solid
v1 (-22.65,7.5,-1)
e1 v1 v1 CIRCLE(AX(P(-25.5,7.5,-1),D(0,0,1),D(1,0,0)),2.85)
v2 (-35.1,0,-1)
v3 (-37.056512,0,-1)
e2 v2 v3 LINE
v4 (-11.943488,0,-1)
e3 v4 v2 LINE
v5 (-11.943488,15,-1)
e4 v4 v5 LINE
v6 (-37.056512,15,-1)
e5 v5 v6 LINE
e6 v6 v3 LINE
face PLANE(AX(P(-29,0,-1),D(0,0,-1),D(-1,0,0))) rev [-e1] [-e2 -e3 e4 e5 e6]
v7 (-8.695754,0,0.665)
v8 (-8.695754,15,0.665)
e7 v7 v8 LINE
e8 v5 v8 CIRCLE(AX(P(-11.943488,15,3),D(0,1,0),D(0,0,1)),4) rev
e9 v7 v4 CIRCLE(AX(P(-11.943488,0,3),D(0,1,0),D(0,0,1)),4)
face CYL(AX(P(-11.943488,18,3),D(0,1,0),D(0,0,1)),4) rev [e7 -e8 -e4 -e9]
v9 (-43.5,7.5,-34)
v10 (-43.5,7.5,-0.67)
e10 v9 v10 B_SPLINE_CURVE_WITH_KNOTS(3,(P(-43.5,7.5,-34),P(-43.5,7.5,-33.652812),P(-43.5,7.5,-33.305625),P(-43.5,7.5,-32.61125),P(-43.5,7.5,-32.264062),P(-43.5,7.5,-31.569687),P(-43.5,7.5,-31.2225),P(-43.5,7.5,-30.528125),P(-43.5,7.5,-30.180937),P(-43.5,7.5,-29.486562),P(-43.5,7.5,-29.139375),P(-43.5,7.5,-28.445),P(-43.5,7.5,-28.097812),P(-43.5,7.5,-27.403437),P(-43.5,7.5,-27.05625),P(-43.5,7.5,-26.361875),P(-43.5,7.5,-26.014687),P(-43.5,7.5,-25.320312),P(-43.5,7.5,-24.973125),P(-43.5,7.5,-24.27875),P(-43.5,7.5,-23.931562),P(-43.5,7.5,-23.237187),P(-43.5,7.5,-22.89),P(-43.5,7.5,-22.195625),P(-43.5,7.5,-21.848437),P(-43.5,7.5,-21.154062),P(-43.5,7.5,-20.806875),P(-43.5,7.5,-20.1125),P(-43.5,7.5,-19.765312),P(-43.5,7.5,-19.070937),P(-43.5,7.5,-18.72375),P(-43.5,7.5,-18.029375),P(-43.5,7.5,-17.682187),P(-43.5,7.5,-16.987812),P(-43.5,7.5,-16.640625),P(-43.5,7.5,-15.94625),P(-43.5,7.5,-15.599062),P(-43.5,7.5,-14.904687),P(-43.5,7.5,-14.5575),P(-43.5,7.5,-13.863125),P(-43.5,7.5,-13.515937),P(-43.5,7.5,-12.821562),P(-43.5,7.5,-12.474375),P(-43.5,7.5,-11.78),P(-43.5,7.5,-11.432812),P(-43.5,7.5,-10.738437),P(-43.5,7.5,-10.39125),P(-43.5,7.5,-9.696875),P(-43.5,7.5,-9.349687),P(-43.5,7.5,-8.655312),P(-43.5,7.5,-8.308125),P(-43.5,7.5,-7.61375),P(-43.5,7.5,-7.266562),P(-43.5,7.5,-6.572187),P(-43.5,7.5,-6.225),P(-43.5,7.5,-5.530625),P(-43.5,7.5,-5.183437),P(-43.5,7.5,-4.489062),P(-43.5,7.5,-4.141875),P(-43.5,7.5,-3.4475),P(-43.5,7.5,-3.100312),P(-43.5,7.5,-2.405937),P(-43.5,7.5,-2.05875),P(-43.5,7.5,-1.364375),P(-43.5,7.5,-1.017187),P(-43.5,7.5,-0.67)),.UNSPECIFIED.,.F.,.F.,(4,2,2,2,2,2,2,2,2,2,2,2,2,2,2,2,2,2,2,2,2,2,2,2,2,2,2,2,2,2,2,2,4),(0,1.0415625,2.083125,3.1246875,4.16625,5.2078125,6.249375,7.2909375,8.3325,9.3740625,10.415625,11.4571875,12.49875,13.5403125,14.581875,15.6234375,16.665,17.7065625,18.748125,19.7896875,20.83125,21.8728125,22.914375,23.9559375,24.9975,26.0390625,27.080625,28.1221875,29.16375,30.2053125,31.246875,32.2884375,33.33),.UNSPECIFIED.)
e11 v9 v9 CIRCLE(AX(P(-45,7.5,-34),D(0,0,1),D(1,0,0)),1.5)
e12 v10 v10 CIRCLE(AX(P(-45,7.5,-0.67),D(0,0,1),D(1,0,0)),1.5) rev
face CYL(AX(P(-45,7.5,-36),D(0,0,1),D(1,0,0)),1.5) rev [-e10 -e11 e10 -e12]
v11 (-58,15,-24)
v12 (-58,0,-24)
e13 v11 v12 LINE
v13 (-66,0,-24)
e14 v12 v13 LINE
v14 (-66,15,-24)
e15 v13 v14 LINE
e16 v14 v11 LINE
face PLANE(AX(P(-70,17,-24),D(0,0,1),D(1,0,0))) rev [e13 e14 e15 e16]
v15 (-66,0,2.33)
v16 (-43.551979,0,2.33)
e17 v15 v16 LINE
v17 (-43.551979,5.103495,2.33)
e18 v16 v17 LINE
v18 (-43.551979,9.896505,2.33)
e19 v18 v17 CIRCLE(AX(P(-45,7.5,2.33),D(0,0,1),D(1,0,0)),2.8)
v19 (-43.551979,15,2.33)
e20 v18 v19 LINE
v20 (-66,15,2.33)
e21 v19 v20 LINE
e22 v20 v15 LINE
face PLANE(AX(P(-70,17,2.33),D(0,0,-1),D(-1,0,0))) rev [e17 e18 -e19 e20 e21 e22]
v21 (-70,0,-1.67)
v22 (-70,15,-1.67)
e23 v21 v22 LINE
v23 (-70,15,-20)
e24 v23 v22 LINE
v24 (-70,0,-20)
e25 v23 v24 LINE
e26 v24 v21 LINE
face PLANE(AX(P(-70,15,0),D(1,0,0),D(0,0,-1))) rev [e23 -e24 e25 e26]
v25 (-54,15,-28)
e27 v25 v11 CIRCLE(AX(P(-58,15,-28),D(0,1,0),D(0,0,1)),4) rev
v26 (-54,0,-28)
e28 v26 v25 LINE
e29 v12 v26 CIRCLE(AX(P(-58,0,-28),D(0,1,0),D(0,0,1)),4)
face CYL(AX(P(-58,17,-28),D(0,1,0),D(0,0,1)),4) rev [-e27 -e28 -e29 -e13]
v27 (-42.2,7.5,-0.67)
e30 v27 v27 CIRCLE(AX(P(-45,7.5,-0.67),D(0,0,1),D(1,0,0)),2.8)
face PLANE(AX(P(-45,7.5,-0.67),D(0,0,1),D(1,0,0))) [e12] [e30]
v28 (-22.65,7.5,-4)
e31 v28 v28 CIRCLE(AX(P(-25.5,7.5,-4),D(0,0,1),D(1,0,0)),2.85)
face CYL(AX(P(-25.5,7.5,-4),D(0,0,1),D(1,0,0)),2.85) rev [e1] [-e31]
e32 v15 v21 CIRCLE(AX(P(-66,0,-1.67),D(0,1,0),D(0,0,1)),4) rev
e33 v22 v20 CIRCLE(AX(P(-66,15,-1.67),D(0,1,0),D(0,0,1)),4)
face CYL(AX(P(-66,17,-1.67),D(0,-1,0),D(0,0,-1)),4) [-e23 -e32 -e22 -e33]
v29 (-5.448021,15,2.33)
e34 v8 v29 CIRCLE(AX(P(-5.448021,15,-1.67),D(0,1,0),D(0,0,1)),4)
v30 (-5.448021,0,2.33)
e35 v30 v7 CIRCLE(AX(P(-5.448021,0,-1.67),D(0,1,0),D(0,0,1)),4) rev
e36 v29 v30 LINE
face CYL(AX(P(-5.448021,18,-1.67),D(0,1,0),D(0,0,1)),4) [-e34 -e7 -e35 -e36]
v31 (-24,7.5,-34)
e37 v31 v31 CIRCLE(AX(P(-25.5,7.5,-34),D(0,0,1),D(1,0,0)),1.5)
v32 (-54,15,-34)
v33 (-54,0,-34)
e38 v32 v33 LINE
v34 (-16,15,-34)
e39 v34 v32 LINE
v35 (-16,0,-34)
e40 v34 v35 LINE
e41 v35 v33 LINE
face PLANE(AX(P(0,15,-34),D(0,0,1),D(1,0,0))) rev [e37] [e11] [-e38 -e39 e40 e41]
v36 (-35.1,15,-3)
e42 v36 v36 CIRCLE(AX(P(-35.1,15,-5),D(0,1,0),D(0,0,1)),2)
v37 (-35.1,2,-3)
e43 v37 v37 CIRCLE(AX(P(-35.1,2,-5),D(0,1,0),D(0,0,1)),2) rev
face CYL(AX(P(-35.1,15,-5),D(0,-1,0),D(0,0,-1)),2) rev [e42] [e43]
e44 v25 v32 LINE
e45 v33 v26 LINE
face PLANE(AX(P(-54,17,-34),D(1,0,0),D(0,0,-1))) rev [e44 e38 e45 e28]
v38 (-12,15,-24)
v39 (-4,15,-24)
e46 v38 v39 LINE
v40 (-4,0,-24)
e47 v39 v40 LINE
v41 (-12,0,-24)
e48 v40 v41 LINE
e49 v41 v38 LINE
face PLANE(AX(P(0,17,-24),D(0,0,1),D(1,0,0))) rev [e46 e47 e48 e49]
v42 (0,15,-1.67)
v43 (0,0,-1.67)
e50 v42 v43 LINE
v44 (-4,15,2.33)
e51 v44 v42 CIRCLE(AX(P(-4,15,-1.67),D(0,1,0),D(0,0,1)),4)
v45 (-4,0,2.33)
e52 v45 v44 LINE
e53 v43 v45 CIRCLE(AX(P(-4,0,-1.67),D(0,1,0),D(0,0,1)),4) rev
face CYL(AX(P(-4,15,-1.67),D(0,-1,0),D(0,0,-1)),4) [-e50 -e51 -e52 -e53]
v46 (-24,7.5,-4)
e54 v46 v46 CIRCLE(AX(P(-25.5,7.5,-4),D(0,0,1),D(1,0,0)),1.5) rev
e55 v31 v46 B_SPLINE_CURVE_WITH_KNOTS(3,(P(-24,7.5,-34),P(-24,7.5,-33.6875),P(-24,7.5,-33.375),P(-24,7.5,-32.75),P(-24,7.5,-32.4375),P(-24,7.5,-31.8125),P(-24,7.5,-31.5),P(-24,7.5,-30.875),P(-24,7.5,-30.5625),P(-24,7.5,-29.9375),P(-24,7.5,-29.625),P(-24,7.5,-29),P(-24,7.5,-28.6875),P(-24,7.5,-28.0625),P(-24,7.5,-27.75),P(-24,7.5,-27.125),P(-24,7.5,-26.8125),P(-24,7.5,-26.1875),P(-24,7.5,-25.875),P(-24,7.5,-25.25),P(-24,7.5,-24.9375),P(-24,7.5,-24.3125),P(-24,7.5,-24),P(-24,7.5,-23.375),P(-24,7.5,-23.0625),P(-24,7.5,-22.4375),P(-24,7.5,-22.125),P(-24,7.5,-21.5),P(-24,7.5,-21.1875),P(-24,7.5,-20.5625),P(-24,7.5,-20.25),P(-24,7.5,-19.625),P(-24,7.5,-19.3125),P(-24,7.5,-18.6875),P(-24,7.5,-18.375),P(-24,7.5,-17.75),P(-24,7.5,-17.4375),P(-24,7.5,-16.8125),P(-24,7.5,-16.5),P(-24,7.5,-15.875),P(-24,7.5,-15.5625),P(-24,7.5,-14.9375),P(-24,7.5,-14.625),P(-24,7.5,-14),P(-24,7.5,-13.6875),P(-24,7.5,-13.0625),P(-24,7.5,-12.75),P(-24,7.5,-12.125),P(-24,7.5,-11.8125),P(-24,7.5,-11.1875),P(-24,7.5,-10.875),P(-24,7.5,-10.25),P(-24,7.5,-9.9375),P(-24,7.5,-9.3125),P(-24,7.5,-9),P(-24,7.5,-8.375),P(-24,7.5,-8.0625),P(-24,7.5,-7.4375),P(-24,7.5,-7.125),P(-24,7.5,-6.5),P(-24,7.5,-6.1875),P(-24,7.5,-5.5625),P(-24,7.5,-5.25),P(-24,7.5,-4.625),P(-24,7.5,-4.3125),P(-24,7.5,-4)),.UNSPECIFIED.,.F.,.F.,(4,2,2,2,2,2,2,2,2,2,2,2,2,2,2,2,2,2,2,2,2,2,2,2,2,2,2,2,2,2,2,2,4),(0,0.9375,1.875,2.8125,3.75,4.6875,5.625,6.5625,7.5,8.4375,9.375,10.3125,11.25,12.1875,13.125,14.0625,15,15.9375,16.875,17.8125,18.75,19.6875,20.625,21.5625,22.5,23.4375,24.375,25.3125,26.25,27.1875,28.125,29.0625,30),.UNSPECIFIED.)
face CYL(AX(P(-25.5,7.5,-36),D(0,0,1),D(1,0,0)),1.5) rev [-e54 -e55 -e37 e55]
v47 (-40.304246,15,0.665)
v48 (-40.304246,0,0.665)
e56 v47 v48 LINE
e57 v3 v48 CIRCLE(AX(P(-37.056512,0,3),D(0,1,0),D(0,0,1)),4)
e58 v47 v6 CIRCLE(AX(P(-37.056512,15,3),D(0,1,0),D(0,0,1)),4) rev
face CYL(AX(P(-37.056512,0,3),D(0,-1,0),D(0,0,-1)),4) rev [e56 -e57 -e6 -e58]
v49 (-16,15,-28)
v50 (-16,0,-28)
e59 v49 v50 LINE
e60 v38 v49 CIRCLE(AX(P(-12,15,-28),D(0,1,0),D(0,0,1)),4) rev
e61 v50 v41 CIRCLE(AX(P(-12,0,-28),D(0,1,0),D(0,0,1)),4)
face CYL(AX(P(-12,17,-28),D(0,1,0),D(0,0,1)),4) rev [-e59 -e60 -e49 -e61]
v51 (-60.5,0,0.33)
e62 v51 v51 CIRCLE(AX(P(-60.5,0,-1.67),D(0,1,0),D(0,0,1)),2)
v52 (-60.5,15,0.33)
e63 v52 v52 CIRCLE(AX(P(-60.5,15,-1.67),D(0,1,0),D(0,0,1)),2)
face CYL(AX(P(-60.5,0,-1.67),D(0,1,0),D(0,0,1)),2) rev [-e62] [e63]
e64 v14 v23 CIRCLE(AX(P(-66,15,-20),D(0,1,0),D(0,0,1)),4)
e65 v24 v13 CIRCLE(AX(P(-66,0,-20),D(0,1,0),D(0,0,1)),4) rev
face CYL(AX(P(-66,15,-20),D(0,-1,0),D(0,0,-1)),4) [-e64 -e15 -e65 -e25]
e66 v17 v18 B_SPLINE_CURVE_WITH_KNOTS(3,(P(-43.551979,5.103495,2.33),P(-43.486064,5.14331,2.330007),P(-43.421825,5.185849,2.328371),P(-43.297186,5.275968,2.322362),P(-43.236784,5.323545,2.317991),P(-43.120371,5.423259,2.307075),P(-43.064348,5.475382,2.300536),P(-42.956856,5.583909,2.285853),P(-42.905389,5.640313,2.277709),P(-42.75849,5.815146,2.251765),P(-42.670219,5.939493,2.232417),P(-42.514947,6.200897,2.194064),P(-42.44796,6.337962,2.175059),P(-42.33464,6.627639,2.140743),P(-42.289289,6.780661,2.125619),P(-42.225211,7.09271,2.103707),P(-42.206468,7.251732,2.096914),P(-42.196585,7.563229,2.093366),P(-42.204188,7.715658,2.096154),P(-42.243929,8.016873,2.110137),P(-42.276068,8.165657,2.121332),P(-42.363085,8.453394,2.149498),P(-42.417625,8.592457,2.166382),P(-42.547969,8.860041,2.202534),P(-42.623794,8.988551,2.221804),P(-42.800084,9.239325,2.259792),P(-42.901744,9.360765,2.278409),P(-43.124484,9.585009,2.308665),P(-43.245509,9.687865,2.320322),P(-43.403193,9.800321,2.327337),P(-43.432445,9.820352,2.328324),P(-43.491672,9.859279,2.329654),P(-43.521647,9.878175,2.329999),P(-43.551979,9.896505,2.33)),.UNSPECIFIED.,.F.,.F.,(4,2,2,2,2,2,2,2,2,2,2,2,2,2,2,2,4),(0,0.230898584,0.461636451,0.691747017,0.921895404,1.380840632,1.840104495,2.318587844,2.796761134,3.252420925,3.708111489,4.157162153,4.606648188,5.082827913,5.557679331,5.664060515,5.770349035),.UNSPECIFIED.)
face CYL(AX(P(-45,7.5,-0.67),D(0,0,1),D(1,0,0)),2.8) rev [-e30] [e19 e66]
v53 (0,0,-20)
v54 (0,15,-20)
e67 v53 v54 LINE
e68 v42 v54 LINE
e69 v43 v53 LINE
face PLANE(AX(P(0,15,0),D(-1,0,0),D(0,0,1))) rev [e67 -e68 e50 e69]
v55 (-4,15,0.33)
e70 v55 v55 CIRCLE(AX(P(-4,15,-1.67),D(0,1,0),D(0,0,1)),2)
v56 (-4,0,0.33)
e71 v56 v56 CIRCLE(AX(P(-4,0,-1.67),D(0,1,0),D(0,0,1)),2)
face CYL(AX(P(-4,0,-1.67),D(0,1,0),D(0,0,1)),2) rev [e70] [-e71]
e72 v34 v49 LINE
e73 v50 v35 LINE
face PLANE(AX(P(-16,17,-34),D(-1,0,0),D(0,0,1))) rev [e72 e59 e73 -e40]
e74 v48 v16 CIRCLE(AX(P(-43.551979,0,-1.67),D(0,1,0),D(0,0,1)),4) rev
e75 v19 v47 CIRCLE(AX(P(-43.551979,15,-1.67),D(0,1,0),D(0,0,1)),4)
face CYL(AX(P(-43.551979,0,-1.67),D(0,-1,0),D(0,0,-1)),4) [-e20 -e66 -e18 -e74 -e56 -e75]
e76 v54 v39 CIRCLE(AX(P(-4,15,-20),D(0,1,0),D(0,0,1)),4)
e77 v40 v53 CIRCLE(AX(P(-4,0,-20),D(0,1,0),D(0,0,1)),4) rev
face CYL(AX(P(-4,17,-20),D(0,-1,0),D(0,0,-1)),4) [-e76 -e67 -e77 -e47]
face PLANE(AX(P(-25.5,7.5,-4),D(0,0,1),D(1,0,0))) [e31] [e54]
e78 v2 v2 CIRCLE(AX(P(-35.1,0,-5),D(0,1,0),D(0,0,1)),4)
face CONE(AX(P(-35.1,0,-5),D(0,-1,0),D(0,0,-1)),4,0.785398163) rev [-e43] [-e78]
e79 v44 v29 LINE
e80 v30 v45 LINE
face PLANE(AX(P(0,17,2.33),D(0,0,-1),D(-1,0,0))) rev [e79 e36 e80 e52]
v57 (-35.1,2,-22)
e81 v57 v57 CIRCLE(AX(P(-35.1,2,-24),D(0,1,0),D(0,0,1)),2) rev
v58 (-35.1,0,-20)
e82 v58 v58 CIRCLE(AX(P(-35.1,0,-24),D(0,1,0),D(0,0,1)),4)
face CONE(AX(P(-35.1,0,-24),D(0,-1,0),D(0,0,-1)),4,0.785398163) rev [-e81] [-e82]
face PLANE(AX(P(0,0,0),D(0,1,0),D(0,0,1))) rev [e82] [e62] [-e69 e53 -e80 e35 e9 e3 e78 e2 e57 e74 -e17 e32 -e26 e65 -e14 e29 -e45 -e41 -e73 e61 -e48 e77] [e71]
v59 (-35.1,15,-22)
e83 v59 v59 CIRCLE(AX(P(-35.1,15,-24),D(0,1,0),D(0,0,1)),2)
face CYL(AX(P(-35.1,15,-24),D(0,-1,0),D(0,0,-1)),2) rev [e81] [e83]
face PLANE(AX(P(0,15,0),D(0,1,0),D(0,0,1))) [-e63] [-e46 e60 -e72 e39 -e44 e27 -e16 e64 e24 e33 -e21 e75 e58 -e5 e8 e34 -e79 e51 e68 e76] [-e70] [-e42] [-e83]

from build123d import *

# Parameters (mm, degrees)
SKETCH1_W           = 70
SKETCH1_H           = 34
SKETCH1_R           = 2
BOSS_EXTRUDE1_DEPTH = 15
SKETCH6_W           = 70
SKETCH6_H           = 15
BOSS_EXTRUDE2_DEPTH = 5
SKETCH3_R           = 2
CUT_EXTRUDE2_DEPTH  = 15
SKETCH8_W           = 6
SKETCH8_H           = 5
CUT_EXTRUDE3_DEPTH  = 15
SKETCH9_W           = 12
SKETCH9_H           = 6
CUT_EXTRUDE4_DEPTH  = 15
SKETCH10_W          = 16
SKETCH10_H          = 10
CUT_EXTRUDE5_DEPTH  = 17
SKETCH12_R          = 1.5
CUT_EXTRUDE6_DEPTH  = 41
SKETCH13_W          = 27.5
SKETCH13_H          = 6
CUT_EXTRUDE7_DEPTH  = 20
SKETCH14_W          = 13.5
SKETCH14_H          = 2.67
SKETCH14_W_2        = 29
CUT_EXTRUDE8_DEPTH  = 17
FILLET2_R           = 4
SKETCH16_W          = 5.5
SKETCH16_H          = 3.33
CUT_EXTRUDE10_DEPTH = 18
FILLET4_R           = 4
FILLET5_R           = 4
SKETCH17_R          = 2.85
CUT_EXTRUDE11_DEPTH = 3
SKETCH18_R          = 2.8
CUT_EXTRUDE12_DEPTH = 3
CHAMFER1_SIZE       = 2
CHAMFER2_SIZE       = 2


# Some blends are built 0.0001 mm under size
with BuildPart() as part:
    # Sketch1 → Boss-Extrude1 (new body)
    with BuildSketch(Plane(origin=(0, 0, 0), x_dir=(1, 0, 0), z_dir=(0, 1, 0))):
        with Locations((-35, 17)):
            Rectangle(SKETCH1_W, SKETCH1_H)
        with Locations(Location((-35.1, 24, 0), (0, 0, 270))):
            Circle(SKETCH1_R, mode=Mode.SUBTRACT)
        with Locations(Location((-35.1, 5, 0), (0, 0, 270))):
            Circle(SKETCH1_R, mode=Mode.SUBTRACT)
    extrude(amount=BOSS_EXTRUDE1_DEPTH)

    # Sketch6 → Boss-Extrude2 (add)
    with BuildSketch(Plane.XY):
        with Locations((-35, 7.5)):
            Rectangle(SKETCH6_W, SKETCH6_H)
    extrude(amount=BOSS_EXTRUDE2_DEPTH)

    # Sketch3 → Cut-Extrude2 (cut)
    with BuildSketch(Plane(origin=(0, 15, 0), x_dir=(1, 0, 0), z_dir=(0, 1, 0))):
        with Locations(Location((-4, 1.67, 0), (0, 0, 270))):
            Circle(SKETCH3_R)
        with Locations(Location((-60.5, 1.67, 0), (0, 0, 270))):
            Circle(SKETCH3_R)
    extrude(amount=-CUT_EXTRUDE2_DEPTH, mode=Mode.SUBTRACT)

    # Sketch8 → Cut-Extrude3 (cut)
    with BuildSketch(Plane(origin=(0, 15, 0), x_dir=(1, 0, 0), z_dir=(0, 1, 0))):
        with Locations((-16.5, -2.5)):
            Rectangle(SKETCH8_W, SKETCH8_H)
    extrude(amount=-CUT_EXTRUDE3_DEPTH, mode=Mode.SUBTRACT)

    # Sketch9 → Cut-Extrude4 (cut)
    with BuildSketch(Plane(origin=(0, 15, 0), x_dir=(1, 0, 0), z_dir=(0, 1, 0))):
        with Locations((-35, -2)):
            Rectangle(SKETCH9_W, SKETCH9_H)
    extrude(amount=-CUT_EXTRUDE4_DEPTH, mode=Mode.SUBTRACT)

    # Sketch10 → Cut-Extrude5 (cut)
    with BuildSketch(Plane.XZ):
        with Locations((-8, -29)):
            Rectangle(SKETCH10_W, SKETCH10_H)
        with Locations((-62, -29)):
            Rectangle(SKETCH10_W, SKETCH10_H)
    extrude(amount=-CUT_EXTRUDE5_DEPTH, mode=Mode.SUBTRACT)

    # Sketch12 → Cut-Extrude6 (cut)
    with BuildSketch(Plane.XY.offset(5)):
        with Locations((-45, 7.5)):
            Circle(SKETCH12_R)
        with Locations((-25.499999999, 7.499999999)):
            Circle(SKETCH12_R)
    extrude(amount=-CUT_EXTRUDE6_DEPTH, mode=Mode.SUBTRACT)

    # Sketch13 → Cut-Extrude7 (cut)
    with BuildSketch(Plane(origin=(0, 15, 0), x_dir=(1, 0, 0), z_dir=(0, 1, 0))):
        with Locations((-27.25, -2)):
            Rectangle(SKETCH13_W, SKETCH13_H)
    extrude(amount=-CUT_EXTRUDE7_DEPTH, mode=Mode.SUBTRACT)

    # Sketch14 → Cut-Extrude8 (cut)
    with BuildSketch(Plane(origin=(0, 0, 0), x_dir=(-1, 0, 0), z_dir=(0, -1, 0))):
        with Locations((6.75, -3.665)):
            Rectangle(SKETCH14_W, SKETCH14_H)
        with Locations((55.5, -3.665)):
            Rectangle(SKETCH14_W_2, SKETCH14_H)
    extrude(amount=-CUT_EXTRUDE8_DEPTH, mode=Mode.SUBTRACT)

    # Fillet2
    fillet2_edges = [part.edges().sort_by_distance(p)[0] for p in [
        (0, 7.5, 2.33),
        (-70, 7.5, 2.33),
        (-70, 7.5, -24),
        (0, 7.5, -24),
    ]]
    fillet(fillet2_edges, radius=FILLET2_R)

    # Sketch16 → Cut-Extrude10 (cut)
    with BuildSketch(Plane.XZ):
        with Locations((-10.75, 0.665)):
            Rectangle(SKETCH16_W, SKETCH16_H)
    extrude(amount=-CUT_EXTRUDE10_DEPTH, mode=Mode.SUBTRACT)

    # Fillet4
    # the kernel refuses this fillet: 4 mm, written as the material it adds along each edge
    with BuildSketch(Plane(origin=(-16, 0, -24), x_dir=(1, 0, 0), z_dir=(0, 1, 0)), Plane(origin=(-54, 0, -24), x_dir=(0, 0, -1), z_dir=(0, 1, 0))) as fillet4_piece_1:
        with BuildLine():
            CenterArc((FILLET4_R, FILLET4_R), FILLET4_R, 180, 90)
            Line((0, FILLET4_R), (-FILLET4_R * 0.02, FILLET4_R))
            Line((-FILLET4_R * 0.02, FILLET4_R), (-FILLET4_R * 0.02, -FILLET4_R * 0.02))
            Line((-FILLET4_R * 0.02, -FILLET4_R * 0.02), (FILLET4_R, -FILLET4_R * 0.02))
            Line((FILLET4_R, -FILLET4_R * 0.02), (FILLET4_R, 0))
        make_face()
    extrude(amount=15)
    with BuildSketch(Plane(origin=(-41, 15, -1), x_dir=(0, 0, 1), z_dir=(0, -1, 0))) as fillet4_piece_2:
        with BuildLine():
            CenterArc((4, -3.943488304), FILLET4_R, 99.642495459, 80.357504541)
            Line((0, -3.943488304), (-0.08, -3.943488304))
            Line((-0.08, -3.943488304), (-0.08, 0))
            Line((-0.08, 0), (0, 0.08))
            ThreePointArc((0, 0.08), (1.665, 0.08), (3.3166, 0.078869766))
            Line((3.3166, 0.078869766), (3.33, 0))
        make_face()
    extrude(amount=15)
    with BuildSketch(Plane(origin=(-8, 0, -1), x_dir=(-1.0, 0, -8.691057696161095e-11), z_dir=(0, 1, 0))) as fillet4_piece_3:
        with BuildLine():
            CenterArc((3.943488303, 4), FILLET4_R, 189.642495464, 80.357504541)
            Line((0, 3.33), (-0.078869766, 3.3166))
            ThreePointArc((-0.078869766, 3.3166), (-0.08, 1.665), (-0.08, 0))
            Line((-0.08, 0), (0, -0.08))
            Line((0, -0.08), (3.943488304, -0.08))
            Line((3.943488304, -0.08), (3.943488304, 0))
        make_face()
    extrude(amount=15)

    # Fillet5
    fillet5_edges = [part.edges().sort_by_distance(p)[0] for p in [
        (-41, 7.5, 2.33),
        (-8, 7.5, 2.33),
    ]]
    fillet(fillet5_edges, radius=FILLET5_R)

    # Sketch17 → Cut-Extrude11 (cut)
    with BuildSketch(Plane.XY.offset(-1)):
        with Locations((-25.499999999, 7.499999999)):
            Circle(SKETCH17_R)
    extrude(amount=-CUT_EXTRUDE11_DEPTH, mode=Mode.SUBTRACT)

    # Sketch18 → Cut-Extrude12 (cut)
    with BuildSketch(Plane.XY.offset(2.33)):
        with Locations((-45, 7.5)):
            Circle(SKETCH18_R)
    extrude(amount=-CUT_EXTRUDE12_DEPTH, mode=Mode.SUBTRACT)

    # Chamfer1
    chamfer1_edges = [part.edges().sort_by_distance(p)[0] for p in [
        (-35.1, 0, -26),
    ]]
    chamfer(chamfer1_edges, length=CHAMFER1_SIZE)

    # Chamfer2
    chamfer2_edges = [part.edges().sort_by_distance(p)[0] for p in [
        (-35.1, 0, -7),
    ]]
    chamfer(chamfer2_edges, length=CHAMFER2_SIZE - 0.0001)  # a hair under: the kernel refuses the full size


solid = part.part
